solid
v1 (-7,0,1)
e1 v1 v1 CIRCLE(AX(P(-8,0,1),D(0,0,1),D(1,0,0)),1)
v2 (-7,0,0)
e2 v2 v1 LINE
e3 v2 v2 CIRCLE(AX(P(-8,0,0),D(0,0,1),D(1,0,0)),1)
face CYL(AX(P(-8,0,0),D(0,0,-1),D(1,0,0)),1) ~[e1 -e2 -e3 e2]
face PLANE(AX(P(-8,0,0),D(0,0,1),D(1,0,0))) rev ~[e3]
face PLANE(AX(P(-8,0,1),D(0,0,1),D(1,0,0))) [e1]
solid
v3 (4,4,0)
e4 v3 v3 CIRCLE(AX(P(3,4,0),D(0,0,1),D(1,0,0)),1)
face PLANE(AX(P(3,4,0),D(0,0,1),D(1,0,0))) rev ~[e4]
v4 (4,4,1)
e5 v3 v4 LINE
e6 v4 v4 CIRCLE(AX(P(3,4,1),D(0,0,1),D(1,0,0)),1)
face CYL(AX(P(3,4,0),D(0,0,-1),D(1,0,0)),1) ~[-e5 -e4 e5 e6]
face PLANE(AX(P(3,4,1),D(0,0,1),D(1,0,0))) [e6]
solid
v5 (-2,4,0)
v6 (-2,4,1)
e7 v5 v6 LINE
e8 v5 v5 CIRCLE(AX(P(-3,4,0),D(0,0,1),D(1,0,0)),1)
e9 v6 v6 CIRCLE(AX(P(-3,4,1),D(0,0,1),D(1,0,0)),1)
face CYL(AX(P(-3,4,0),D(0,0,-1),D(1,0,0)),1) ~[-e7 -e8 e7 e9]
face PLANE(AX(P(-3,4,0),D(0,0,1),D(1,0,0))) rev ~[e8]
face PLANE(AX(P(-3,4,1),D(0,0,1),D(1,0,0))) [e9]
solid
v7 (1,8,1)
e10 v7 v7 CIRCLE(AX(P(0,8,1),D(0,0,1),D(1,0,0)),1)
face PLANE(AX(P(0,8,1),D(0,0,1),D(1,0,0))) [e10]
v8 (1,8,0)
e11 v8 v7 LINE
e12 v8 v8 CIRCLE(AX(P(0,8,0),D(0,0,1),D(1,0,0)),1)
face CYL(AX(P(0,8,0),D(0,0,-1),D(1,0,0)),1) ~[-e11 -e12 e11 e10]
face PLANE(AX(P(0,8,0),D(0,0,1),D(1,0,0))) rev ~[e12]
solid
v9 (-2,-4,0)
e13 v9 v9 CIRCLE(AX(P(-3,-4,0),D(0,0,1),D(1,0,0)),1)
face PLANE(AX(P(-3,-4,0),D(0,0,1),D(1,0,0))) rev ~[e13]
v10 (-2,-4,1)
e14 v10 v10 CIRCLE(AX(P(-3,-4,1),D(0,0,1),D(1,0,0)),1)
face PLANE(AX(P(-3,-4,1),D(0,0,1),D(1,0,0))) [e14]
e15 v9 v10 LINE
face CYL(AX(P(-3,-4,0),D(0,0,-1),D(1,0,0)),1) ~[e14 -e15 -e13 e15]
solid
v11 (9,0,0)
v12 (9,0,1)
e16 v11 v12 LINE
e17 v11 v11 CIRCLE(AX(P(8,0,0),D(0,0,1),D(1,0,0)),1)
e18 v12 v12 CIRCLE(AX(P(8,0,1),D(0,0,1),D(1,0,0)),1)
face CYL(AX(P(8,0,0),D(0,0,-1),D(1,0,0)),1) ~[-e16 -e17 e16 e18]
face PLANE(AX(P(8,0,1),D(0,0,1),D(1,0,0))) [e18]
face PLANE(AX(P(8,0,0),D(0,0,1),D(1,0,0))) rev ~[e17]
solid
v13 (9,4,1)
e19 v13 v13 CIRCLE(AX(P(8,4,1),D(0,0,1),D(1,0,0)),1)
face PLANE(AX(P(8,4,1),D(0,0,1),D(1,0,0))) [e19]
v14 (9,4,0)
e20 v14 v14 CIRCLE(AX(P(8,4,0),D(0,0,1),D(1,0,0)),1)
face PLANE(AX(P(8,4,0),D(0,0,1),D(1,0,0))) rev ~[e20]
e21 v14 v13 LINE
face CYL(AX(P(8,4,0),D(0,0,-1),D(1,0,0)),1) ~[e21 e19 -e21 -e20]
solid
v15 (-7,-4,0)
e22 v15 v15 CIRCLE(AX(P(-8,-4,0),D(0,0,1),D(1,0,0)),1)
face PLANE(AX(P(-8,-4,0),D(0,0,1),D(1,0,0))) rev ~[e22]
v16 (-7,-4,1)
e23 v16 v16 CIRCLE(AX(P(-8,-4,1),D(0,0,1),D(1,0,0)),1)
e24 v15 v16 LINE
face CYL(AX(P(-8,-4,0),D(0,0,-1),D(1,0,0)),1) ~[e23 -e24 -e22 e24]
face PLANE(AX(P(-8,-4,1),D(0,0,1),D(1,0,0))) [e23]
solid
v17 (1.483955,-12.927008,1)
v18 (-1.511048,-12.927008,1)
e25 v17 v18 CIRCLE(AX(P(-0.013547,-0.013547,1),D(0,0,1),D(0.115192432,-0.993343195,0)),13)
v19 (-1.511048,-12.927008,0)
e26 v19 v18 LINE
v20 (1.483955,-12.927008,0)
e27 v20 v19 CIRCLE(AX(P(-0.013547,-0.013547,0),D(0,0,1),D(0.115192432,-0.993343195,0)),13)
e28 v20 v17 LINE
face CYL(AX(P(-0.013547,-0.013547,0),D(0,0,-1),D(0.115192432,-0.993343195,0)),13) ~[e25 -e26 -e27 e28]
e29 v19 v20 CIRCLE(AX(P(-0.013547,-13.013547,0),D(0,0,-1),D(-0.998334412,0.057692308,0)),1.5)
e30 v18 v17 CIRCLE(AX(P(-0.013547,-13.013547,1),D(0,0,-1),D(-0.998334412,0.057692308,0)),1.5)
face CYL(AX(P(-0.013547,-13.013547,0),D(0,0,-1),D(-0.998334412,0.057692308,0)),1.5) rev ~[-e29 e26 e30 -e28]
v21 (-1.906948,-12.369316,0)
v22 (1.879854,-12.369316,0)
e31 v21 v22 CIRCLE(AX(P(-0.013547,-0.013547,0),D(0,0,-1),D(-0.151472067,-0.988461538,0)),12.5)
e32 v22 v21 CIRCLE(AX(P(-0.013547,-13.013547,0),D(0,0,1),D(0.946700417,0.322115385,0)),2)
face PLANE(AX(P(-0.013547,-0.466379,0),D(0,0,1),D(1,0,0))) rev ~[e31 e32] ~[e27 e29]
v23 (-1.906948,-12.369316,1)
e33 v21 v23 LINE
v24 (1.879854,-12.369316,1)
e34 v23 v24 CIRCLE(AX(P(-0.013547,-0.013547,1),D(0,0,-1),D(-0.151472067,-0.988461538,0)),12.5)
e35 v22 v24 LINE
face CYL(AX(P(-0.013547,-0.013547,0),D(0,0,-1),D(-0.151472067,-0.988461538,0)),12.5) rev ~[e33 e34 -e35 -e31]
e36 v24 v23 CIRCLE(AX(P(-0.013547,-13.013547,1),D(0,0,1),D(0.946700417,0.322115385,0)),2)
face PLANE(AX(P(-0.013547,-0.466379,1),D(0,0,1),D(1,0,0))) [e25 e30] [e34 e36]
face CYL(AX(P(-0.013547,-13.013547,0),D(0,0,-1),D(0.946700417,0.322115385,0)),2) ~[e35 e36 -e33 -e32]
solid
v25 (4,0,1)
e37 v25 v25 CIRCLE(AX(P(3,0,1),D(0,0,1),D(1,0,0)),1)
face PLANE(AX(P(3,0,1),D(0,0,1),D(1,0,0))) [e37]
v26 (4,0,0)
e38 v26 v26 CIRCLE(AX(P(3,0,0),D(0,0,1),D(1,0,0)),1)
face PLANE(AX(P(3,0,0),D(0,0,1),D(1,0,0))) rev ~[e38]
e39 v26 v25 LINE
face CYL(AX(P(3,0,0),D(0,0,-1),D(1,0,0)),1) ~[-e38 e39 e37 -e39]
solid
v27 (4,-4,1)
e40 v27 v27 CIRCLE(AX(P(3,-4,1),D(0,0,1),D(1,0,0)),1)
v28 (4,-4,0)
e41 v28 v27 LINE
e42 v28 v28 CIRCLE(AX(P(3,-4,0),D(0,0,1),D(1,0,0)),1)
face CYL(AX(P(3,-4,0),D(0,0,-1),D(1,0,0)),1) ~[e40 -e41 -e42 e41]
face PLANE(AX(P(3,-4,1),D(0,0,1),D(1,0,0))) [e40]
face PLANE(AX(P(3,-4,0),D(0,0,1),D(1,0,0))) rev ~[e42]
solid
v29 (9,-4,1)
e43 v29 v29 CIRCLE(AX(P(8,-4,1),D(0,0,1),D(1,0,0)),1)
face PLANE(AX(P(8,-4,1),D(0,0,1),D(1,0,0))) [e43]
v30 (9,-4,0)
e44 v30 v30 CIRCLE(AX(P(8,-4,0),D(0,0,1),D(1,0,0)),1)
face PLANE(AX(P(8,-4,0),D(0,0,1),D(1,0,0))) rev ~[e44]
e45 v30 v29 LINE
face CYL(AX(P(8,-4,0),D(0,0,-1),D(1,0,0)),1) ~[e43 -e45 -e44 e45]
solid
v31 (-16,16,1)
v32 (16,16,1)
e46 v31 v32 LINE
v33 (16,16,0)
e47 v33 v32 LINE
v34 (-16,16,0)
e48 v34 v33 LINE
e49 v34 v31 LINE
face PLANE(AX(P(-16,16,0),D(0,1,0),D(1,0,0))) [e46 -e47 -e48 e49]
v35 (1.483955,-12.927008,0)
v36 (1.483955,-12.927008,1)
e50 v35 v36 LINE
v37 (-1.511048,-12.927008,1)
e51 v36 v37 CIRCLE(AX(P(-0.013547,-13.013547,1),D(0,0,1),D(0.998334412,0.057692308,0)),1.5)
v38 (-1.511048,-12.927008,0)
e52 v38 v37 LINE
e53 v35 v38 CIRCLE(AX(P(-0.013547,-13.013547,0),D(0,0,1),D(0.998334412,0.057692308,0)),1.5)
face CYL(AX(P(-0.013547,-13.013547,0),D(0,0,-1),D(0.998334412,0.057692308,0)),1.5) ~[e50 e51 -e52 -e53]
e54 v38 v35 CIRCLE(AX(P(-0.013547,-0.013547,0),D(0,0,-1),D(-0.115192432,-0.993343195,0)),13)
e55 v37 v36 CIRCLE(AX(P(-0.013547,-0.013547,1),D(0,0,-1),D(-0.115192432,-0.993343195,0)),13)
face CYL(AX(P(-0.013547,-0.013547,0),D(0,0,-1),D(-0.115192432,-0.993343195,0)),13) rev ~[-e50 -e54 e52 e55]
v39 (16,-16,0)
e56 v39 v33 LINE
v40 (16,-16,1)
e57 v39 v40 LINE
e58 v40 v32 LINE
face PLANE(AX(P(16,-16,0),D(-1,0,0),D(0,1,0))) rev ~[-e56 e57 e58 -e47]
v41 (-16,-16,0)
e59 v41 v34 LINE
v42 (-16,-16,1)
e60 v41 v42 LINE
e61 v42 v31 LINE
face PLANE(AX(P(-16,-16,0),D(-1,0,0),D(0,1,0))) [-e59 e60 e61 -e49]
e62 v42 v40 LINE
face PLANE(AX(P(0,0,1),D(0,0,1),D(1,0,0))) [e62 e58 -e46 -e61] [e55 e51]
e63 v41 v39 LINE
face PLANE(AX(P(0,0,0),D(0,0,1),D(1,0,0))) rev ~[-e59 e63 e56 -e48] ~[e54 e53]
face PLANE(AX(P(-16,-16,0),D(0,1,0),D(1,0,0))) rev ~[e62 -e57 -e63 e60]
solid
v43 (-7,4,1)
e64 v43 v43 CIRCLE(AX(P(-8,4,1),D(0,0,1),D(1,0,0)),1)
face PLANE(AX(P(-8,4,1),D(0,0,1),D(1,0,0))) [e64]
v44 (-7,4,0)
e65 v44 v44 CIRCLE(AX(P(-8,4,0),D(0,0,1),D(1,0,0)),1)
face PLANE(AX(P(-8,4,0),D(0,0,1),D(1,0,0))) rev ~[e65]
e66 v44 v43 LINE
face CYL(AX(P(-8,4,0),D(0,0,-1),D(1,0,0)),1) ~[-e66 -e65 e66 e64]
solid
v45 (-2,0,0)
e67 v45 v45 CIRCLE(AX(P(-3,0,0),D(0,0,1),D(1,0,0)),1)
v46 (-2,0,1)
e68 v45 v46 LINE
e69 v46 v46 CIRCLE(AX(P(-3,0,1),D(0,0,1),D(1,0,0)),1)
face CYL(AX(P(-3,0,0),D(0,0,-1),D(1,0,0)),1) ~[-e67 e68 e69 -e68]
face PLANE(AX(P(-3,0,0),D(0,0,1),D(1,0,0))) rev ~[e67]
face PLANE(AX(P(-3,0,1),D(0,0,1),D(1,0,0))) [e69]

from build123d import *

# Parameters (mm, degrees)
F1_DEPTH = 1
F0_R     = 1
F0_W     = 32
F0_H     = 32
F2_DEPTH = 1


# Not quite as in the source:
# - a feature names something its author has since deleted; it is built from what else it names


with BuildPart() as f1:
    # F0 (on Top) → F1 (new body)
    with BuildSketch(Plane.XY):
        with BuildLine():
            ThreePointArc((-1.5110484064, -12.9270083272), (-0.0135467888, -11.5135467888), (1.4839548288, -12.9270083272))
            ThreePointArc((1.4839548288, -12.9270083272), (-0.0135467888, 12.9864532112), (-1.5110484064, -12.9270083272))
        make_face()
        with BuildLine():
            ThreePointArc((-1.9069476222, -12.3693160195), (-0.0135467888, 12.4864532112), (1.8798540446, -12.3693160195))
            ThreePointArc((1.8798540446, -12.3693160195), (-0.0135467888, -11.0135467888), (-1.9069476222, -12.3693160195))
        make_face(mode=Mode.SUBTRACT)
    extrude(amount=F1_DEPTH)


with BuildPart() as f1b:
    # F0 (on Top) → F1, piece 2 (new body)
    with BuildSketch(Plane.XY):
        with Locations((-8, 4)):
            Circle(F0_R)
    extrude(amount=F1_DEPTH)


with BuildPart() as f1c:
    # F0 (on Top) → F1, piece 3 (new body)
    with BuildSketch(Plane.XY):
        with Locations((-3, 4)):
            Circle(F0_R)
    extrude(amount=F1_DEPTH)


with BuildPart() as f1d:
    # F0 (on Top) → F1, piece 4 (new body)
    with BuildSketch(Plane.XY):
        with Locations((0, 8)):
            Circle(F0_R)
    extrude(amount=F1_DEPTH)


with BuildPart() as f1e:
    # F0 (on Top) → F1, piece 5 (new body)
    with BuildSketch(Plane.XY):
        with Locations((3, 4)):
            Circle(F0_R)
    extrude(amount=F1_DEPTH)


with BuildPart() as f1f:
    # F0 (on Top) → F1, piece 6 (new body)
    with BuildSketch(Plane.XY):
        with Locations((8, 4)):
            Circle(F0_R)
    extrude(amount=F1_DEPTH)


with BuildPart() as f1g:
    # F0 (on Top) → F1, piece 7 (new body)
    with BuildSketch(Plane.XY):
        with Locations((8, 0)):
            Circle(F0_R)
    extrude(amount=F1_DEPTH)


with BuildPart() as f1h:
    # F0 (on Top) → F1, piece 8 (new body)
    with BuildSketch(Plane.XY):
        with Locations((8, -4)):
            Circle(F0_R)
    extrude(amount=F1_DEPTH)


with BuildPart() as f1i:
    # F0 (on Top) → F1, piece 9 (new body)
    with BuildSketch(Plane.XY):
        with Locations((3, -4)):
            Circle(F0_R)
    extrude(amount=F1_DEPTH)


with BuildPart() as f1j:
    # F0 (on Top) → F1, piece 10 (new body)
    with BuildSketch(Plane.XY):
        with Locations((3, 0)):
            Circle(F0_R)
    extrude(amount=F1_DEPTH)


with BuildPart() as f1k:
    # F0 (on Top) → F1, piece 11 (new body)
    with BuildSketch(Plane.XY):
        with Locations((-3, 0)):
            Circle(F0_R)
    extrude(amount=F1_DEPTH)


with BuildPart() as f1l:
    # F0 (on Top) → F1, piece 12 (new body)
    with BuildSketch(Plane.XY):
        with Locations((-3, -4)):
            Circle(F0_R)
    extrude(amount=F1_DEPTH)


with BuildPart() as f1m:
    # F0 (on Top) → F1, piece 13 (new body)
    with BuildSketch(Plane.XY):
        with Locations((-8, -4)):
            Circle(F0_R)
    extrude(amount=F1_DEPTH)


with BuildPart() as f1n:
    # F0 (on Top) → F1, piece 14 (new body)
    with BuildSketch(Plane.XY):
        with Locations((-8, 0)):
            Circle(F0_R)
    extrude(amount=F1_DEPTH)


with BuildPart() as f2:
    # F0 (on Top) → F2 (new body)
    with BuildSketch(Plane.XY):
        Rectangle(F0_W, F0_H)
        with BuildLine():
            ThreePointArc((-1.5110484064, -12.9270083272), (-0.0135467888, 12.9864532112), (1.4839548288, -12.9270083272))
            ThreePointArc((1.4839548288, -12.9270083272), (-0.0135467888, -11.5135467888), (-1.5110484064, -12.9270083272))
        make_face(mode=Mode.SUBTRACT)
    extrude(amount=F2_DEPTH)


solid = Compound([f1.part, f1b.part, f1c.part, f1d.part, f1e.part, f1f.part, f1g.part, f1h.part, f1i.part, f1j.part, f1k.part, f1l.part, f1m.part, f1n.part, f2.part])
